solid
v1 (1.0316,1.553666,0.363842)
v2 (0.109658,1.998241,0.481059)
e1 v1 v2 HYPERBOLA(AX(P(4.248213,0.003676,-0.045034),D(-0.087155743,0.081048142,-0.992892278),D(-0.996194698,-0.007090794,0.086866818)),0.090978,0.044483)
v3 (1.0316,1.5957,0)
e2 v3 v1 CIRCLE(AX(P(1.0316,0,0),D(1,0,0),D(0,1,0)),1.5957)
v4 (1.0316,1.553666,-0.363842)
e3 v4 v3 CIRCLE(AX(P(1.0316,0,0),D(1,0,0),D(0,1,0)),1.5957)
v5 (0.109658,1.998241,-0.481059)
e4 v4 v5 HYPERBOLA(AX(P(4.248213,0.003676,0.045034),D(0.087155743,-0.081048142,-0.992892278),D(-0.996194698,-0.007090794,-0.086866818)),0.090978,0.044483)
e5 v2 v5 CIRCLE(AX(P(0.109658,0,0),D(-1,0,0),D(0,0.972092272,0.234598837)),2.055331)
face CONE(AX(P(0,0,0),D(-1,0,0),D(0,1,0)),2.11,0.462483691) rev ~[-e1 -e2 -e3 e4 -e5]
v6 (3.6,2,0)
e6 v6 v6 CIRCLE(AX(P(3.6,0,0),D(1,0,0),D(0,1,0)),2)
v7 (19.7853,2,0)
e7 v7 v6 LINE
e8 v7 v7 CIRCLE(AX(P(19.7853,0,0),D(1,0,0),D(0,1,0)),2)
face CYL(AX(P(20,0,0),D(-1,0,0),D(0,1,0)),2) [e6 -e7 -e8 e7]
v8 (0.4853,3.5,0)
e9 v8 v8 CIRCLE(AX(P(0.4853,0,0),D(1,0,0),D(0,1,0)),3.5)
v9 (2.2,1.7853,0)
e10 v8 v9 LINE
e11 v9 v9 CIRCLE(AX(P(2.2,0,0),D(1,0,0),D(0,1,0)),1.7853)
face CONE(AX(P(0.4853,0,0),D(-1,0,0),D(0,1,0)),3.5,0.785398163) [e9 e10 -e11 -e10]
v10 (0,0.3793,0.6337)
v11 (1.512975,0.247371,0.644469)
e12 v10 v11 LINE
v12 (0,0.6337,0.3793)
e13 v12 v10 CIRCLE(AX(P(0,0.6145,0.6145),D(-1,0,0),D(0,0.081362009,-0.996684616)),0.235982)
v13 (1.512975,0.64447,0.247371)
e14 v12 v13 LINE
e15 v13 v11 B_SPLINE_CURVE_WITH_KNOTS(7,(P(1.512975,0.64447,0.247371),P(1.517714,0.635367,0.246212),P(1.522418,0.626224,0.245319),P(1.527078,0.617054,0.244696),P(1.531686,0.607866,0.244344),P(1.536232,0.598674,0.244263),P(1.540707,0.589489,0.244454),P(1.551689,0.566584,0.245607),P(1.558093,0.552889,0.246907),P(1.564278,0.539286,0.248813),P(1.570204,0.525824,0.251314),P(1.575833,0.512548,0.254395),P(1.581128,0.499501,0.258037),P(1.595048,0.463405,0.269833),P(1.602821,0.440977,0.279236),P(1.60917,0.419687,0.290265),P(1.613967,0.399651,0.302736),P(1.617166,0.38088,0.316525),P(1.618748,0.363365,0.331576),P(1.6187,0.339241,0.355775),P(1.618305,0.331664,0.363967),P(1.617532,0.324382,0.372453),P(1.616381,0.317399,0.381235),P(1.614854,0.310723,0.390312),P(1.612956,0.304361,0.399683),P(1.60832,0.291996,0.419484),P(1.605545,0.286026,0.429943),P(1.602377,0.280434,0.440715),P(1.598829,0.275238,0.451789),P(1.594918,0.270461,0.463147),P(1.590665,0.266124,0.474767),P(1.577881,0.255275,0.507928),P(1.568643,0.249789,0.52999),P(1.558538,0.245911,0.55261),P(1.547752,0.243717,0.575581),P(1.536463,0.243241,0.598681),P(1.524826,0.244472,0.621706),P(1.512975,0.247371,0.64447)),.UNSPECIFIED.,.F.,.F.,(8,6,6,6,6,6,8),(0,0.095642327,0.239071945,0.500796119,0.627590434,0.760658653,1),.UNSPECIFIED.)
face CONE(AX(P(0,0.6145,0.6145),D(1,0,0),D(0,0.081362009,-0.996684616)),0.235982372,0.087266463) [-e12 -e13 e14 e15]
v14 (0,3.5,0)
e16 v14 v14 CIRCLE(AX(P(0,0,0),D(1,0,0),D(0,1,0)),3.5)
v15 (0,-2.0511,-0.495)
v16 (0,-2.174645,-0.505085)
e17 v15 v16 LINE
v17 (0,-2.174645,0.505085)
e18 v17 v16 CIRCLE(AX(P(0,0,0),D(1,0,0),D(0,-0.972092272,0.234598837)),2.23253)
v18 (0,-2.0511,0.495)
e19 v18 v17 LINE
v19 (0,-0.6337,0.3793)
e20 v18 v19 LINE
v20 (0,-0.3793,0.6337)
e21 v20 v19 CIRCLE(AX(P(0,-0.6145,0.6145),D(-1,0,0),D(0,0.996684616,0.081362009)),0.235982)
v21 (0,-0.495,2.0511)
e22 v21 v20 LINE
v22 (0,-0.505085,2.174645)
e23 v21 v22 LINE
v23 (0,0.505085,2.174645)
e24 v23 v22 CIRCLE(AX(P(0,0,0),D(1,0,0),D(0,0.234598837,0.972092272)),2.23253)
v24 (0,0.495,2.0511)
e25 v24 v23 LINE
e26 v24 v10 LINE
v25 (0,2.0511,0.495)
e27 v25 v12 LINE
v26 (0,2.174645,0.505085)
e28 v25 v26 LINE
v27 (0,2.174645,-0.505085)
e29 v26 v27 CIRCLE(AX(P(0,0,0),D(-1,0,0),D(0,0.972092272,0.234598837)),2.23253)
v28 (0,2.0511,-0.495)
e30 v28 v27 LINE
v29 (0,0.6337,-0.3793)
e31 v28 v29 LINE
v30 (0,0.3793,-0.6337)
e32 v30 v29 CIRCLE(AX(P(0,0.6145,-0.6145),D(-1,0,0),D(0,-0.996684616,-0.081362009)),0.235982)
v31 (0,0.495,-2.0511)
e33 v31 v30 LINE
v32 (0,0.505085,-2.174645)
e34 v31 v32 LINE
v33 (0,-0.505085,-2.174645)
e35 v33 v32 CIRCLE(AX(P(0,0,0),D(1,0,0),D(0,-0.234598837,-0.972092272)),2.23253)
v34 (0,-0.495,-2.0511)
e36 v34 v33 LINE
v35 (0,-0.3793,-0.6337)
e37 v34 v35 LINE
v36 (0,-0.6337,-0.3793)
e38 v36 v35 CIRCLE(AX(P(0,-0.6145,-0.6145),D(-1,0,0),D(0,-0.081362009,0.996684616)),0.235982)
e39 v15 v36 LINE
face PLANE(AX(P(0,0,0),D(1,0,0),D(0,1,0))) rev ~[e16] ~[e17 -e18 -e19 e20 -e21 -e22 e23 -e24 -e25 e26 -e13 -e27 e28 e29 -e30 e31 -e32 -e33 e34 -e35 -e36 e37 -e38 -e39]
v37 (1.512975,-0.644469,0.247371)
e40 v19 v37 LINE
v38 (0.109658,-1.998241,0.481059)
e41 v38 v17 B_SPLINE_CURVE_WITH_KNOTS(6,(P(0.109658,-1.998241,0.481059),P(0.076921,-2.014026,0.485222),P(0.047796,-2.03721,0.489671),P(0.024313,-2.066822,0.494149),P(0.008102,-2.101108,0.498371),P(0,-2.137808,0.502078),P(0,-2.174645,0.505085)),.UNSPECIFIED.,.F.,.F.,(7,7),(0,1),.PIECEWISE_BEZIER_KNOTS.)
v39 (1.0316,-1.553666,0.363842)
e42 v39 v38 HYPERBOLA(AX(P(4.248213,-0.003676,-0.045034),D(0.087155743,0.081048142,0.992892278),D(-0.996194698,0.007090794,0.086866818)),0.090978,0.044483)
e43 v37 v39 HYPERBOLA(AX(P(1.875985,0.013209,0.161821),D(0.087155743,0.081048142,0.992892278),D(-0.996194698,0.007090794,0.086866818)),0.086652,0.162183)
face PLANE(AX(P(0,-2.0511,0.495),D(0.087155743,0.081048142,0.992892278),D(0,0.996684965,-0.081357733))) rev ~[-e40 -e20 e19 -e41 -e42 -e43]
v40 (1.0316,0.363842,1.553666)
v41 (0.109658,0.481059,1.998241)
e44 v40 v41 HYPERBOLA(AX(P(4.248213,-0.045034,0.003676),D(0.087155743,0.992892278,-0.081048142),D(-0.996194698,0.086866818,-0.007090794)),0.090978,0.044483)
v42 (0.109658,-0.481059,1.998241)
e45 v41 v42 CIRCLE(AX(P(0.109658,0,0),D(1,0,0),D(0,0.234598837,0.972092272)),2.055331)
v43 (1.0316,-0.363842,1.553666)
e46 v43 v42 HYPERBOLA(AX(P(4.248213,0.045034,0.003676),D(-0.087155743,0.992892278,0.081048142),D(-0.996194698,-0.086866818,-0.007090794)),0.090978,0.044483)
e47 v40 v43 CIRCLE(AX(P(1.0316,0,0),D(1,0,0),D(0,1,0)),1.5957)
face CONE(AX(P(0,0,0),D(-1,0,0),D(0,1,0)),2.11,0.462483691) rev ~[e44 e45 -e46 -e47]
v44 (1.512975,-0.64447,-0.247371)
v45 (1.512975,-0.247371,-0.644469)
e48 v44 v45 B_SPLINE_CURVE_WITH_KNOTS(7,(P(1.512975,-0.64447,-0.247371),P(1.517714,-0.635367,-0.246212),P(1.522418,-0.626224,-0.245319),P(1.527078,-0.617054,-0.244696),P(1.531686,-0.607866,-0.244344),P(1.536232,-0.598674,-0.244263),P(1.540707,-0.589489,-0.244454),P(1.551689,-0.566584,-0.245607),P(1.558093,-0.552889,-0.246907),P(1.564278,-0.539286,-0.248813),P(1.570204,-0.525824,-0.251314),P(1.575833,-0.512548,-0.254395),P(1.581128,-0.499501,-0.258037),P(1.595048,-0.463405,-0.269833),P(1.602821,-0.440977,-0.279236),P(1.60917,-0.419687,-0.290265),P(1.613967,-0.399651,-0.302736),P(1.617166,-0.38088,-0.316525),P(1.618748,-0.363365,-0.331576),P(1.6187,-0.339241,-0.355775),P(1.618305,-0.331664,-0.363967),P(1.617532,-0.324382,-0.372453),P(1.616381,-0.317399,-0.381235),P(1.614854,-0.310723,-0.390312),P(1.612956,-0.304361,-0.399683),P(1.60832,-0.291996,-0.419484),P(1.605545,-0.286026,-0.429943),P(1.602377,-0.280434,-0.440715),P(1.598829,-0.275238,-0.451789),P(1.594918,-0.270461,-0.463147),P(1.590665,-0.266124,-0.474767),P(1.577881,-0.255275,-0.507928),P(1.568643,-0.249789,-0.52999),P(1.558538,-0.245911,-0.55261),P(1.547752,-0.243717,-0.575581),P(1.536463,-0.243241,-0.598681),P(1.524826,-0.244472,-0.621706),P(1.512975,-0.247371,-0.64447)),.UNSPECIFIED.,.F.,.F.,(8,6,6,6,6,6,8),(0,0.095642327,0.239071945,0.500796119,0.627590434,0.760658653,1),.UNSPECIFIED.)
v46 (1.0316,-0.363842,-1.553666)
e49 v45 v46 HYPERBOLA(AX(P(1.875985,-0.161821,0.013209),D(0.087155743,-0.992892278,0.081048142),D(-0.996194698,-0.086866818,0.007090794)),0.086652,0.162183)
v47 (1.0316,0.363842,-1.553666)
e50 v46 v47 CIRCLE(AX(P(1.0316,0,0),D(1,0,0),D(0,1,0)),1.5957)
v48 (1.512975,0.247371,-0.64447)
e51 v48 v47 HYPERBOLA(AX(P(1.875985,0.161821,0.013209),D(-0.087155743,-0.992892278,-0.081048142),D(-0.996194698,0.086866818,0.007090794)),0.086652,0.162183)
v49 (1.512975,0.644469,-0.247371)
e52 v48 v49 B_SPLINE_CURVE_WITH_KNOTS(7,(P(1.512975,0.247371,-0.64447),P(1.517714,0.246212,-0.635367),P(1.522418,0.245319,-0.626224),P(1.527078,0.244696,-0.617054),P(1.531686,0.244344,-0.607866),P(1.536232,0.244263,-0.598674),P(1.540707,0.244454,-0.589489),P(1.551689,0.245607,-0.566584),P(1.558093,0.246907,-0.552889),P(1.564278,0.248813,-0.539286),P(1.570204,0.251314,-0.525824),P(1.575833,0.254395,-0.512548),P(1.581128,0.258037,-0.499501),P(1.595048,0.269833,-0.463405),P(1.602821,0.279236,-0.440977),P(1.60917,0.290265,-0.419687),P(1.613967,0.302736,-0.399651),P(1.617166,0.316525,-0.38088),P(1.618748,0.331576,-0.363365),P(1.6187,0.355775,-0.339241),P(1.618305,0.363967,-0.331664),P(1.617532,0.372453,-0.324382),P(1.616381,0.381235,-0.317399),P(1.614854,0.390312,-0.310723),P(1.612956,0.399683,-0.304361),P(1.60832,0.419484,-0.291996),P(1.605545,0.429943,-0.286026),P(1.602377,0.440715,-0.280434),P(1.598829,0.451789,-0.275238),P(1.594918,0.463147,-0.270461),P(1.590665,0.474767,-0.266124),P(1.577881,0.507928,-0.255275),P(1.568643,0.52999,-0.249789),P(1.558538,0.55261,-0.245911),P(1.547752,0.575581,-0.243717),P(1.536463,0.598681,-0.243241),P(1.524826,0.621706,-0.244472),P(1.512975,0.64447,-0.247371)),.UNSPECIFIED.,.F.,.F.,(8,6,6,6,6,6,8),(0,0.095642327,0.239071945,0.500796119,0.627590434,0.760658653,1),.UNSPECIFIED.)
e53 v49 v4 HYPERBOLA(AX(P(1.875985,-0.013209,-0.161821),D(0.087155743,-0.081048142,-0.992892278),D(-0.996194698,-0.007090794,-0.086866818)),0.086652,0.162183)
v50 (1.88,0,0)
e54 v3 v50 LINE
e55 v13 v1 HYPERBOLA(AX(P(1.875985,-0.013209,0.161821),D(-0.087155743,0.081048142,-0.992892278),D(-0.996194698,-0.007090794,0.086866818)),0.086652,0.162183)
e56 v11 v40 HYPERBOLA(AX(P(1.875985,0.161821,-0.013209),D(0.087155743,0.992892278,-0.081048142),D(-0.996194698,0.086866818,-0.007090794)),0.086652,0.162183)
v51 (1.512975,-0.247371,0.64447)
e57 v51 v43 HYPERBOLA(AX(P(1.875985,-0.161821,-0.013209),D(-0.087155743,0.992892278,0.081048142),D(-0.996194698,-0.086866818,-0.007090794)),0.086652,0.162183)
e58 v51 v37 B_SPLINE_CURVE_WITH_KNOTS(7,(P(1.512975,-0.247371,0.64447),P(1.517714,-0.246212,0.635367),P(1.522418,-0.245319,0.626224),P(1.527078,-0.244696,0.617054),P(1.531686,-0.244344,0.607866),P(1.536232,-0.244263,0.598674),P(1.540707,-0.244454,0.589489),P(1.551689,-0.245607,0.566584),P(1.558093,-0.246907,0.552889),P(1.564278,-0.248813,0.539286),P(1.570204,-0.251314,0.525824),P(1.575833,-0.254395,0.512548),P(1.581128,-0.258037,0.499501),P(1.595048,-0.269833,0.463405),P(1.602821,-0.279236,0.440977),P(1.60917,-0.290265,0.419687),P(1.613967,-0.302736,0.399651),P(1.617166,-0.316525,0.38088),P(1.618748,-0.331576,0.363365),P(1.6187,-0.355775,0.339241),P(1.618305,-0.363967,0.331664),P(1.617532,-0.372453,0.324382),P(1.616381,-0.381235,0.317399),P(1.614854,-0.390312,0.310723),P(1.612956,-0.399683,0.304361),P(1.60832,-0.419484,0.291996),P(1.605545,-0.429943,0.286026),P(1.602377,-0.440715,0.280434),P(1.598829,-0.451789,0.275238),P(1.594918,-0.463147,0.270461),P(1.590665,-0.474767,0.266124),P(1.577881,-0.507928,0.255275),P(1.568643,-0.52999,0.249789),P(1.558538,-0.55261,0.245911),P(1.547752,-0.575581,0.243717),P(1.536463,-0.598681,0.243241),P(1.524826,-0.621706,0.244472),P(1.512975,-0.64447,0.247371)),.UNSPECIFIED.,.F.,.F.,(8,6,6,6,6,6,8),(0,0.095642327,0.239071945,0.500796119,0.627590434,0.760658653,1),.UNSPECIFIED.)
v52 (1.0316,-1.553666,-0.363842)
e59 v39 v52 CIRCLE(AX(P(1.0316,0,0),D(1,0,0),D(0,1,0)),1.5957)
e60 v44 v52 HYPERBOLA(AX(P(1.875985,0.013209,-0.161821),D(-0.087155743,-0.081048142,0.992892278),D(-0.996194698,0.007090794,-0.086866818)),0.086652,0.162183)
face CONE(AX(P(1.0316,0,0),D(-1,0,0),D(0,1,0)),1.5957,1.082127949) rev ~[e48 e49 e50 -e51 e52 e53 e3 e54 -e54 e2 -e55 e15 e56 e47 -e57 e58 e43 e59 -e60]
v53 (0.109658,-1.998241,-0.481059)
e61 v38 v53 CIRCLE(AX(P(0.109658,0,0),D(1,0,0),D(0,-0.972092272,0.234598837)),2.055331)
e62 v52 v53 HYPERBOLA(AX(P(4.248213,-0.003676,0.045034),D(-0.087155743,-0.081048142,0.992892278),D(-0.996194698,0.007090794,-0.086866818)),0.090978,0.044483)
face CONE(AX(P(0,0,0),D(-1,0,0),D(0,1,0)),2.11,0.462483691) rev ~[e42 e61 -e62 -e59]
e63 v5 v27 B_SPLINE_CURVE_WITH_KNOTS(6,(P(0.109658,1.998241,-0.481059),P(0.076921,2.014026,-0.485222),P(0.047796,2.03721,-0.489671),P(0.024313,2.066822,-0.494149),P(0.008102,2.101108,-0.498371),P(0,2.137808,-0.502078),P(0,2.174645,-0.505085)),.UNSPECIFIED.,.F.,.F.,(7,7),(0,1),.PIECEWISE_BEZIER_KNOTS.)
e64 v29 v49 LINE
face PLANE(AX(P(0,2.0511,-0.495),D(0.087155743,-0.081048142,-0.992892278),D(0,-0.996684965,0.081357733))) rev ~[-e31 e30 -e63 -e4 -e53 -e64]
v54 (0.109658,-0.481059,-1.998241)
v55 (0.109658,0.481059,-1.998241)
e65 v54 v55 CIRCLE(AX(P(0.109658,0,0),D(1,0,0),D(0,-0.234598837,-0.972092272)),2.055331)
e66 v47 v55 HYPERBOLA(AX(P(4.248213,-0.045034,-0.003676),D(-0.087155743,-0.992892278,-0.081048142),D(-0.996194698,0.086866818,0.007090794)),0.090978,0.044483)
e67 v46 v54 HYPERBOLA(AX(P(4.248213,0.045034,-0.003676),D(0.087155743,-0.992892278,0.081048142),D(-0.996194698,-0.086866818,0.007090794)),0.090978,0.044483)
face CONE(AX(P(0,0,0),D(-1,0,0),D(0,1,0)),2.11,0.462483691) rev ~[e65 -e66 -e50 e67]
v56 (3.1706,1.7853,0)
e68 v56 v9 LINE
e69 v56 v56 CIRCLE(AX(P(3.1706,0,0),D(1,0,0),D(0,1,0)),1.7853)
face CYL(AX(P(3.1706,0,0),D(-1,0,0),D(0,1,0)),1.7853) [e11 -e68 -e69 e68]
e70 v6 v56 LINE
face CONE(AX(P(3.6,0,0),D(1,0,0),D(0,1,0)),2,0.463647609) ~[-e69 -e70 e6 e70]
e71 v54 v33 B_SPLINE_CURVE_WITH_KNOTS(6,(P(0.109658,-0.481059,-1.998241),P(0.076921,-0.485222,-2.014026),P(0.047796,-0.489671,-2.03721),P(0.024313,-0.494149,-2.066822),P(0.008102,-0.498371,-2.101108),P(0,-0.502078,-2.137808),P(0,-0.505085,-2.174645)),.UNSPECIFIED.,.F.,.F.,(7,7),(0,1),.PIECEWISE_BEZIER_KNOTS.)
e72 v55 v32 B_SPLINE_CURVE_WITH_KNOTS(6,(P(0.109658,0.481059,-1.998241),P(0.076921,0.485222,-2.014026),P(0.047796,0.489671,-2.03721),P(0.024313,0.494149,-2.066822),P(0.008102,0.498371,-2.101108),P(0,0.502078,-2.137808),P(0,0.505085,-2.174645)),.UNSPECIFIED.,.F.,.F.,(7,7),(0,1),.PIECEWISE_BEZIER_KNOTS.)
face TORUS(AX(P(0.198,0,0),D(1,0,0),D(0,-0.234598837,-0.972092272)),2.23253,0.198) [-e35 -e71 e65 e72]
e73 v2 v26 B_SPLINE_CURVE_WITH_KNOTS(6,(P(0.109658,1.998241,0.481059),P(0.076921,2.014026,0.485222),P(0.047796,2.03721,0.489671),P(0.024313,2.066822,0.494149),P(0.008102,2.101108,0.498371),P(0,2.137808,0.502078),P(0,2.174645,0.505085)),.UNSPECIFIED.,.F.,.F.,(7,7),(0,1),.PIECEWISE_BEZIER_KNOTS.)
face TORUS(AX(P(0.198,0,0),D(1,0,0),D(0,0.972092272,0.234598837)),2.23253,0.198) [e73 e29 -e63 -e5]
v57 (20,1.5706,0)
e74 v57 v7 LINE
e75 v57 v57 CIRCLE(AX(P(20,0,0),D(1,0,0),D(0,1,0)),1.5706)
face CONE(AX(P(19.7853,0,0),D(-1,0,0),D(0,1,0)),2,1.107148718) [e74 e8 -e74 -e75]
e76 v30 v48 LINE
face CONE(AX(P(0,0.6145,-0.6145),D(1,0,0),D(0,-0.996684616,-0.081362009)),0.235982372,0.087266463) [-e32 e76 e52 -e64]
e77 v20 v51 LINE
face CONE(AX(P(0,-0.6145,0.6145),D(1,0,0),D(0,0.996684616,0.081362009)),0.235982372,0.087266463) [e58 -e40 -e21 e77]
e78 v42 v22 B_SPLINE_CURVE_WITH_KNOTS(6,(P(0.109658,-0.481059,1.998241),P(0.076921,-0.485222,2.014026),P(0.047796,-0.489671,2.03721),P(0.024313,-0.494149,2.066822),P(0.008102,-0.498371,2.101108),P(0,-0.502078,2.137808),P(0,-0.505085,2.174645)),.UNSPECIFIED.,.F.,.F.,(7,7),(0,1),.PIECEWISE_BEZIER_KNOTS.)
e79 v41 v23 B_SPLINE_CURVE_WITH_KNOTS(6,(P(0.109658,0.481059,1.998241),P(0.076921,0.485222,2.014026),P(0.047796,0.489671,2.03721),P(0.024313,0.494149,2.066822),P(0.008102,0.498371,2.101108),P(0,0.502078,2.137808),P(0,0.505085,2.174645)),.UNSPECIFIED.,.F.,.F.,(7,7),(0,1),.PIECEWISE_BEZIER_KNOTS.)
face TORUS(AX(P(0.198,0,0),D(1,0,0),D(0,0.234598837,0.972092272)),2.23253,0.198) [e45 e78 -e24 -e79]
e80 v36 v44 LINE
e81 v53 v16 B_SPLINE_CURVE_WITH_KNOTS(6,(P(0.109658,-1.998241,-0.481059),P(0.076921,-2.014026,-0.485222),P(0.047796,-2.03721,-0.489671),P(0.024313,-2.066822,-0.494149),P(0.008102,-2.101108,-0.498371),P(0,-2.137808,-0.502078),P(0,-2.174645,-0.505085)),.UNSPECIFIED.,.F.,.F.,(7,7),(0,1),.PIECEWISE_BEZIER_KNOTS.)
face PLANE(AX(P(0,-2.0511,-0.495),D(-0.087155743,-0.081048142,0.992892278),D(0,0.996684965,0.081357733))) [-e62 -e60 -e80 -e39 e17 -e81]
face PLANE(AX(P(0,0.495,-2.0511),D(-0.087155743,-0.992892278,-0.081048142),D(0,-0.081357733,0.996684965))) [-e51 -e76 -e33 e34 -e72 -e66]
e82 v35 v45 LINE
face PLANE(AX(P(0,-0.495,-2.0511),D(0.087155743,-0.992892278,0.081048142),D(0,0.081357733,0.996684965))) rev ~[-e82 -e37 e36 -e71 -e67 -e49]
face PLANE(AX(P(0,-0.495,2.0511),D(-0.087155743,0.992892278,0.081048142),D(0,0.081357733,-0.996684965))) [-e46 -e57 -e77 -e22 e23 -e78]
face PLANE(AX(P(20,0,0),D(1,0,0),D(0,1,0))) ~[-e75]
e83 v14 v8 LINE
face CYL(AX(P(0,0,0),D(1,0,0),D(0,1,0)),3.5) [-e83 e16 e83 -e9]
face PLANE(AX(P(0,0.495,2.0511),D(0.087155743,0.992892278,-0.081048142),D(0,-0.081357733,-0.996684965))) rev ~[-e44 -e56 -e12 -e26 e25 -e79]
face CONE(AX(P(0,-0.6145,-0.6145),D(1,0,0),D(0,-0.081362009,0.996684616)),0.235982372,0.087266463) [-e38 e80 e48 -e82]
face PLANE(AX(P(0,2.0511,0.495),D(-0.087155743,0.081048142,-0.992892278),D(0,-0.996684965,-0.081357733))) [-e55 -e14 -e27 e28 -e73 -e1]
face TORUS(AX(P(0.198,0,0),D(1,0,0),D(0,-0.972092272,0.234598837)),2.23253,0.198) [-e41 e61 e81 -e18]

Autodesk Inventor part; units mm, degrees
ref_plane "YZ Plane" through (0, 0, 0) normal (1, 0, 0) x (0, 1, 0)
ref_plane "XZ Plane" through (0, 0, 0) normal (0, 1, 0) x (-1, 0, 0)
sketch "Sketch1" plane through (0, 0, 0) normal (0, 0, 1) x (1, 0, 0)
  line L0 (1.88, 0) -> (20, 0)
  line L1 (20, 0) -> (20, 2)
  line L2 (20, 2) -> (3.6, 2)
  line L3 (3.6, 2) -> (3.1706, 1.7853)
  line L4 (3.1706, 1.7853) -> (2.2, 1.7853)
  line L5 (0, 3.5) -> (0, 2.11)
  line L6 (0, 2.11) -> (1.0316, 1.5957)
  line L7 (1.0316, 1.5957) -> (1.88, 0)
  line L8 (-4, 0) -> (24, 0) projected
  line L9 (0, -0.7) -> (0, 4.2) projected
  line L10 (0, 3.5) -> (0.4853, 3.5)
  line L11 (0.4853, 3.5) -> (2.2, 1.7853)
  line L12 (3.6, 2) -> (1.9853, 2) construction
  dimension "d1" = 16.4
  dimension "d2" = 4
  dimension "d3" = 3.5706
  dimension "d4" = 4.22
  dimension "d5" = 26.5
  dimension "d6" = 62
  dimension "d7" = 1.88
  dimension "d8" = 0.4294
  dimension "d12" = 7
  dimension "d13" = 45
  dimension "d15" = 20
  dimension "d24" = 2.2
revolve "Body" add sketch "Sketch1" angle 360 about axis through (1.88, 0, 0) along (1, 0, 0) contours L7 L6 L5 L10 L11 L4 L3 L2 L1 L0
sketch "Sketch2" plane through (0, 0, 0) normal (-1, 0, 0) x (0, 0, 1)
  line L0 (0, 2.11) -> (0, 0) construction
  line L1 (0, 0) -> (2.11, 0) construction
  arc A0 (0.633, 0) -> (0, 0.633) centre (0, 0) ccw construction
  arc A1 (0.7385, 0) -> (0, 0.7385) centre (0, 0) ccw construction
  arc A2 (2.0511, 0.495) -> (0.495, 2.0511) centre (0, 0) ccw
  line L2 (0, 0) -> (1.492, 1.492) construction
  line L3 (0.495, 2.0511) -> (0.3793, 0.6337)
  line L4 (2.0511, 0.495) -> (0.6337, 0.3793)
  arc A3 (0.495, 2.0511) -> (0, 2.11) centre (0, 0) ccw
  arc A4 (2.11, 0) -> (2.0511, 0.495) centre (0, 0) ccw
  line L5 (0, -4.9) -> (0, 4.9) projected
  line L6 (-4.9, 0) -> (4.9, 0) projected
  arc A5 (0.495, -2.0511) -> (2.0511, -0.495) centre (0, 0) ccw
  line L7 (0.495, -2.0511) -> (0.3793, -0.6337)
  line L8 (2.0511, -0.495) -> (0.6337, -0.3793)
  arc A6 (0, -2.11) -> (0.495, -2.0511) centre (0, 0) ccw
  arc A7 (2.0511, -0.495) -> (2.11, 0) centre (0, 0) ccw
  arc A8 (-0.495, 2.0511) -> (-2.0511, 0.495) centre (0, 0) ccw
  line L9 (-0.495, 2.0511) -> (-0.3793, 0.6337)
  line L10 (-2.0511, 0.495) -> (-0.6337, 0.3793)
  arc A9 (0, 2.11) -> (-0.495, 2.0511) centre (0, 0) ccw
  arc A10 (-2.0511, 0.495) -> (-2.11, 0) centre (0, 0) ccw
  arc A11 (-0.495, -2.0511) -> (0, -2.11) centre (0, 0) ccw
  arc A12 (-2.0511, -0.495) -> (-0.495, -2.0511) centre (0, 0) ccw
  arc A13 (-2.11, 0) -> (-2.0511, -0.495) centre (0, 0) ccw
  line L11 (-2.0511, -0.495) -> (-0.6337, -0.3793)
  line L12 (-0.495, -2.0511) -> (-0.3793, -0.6337)
  arc A14 (0.3793, 0.6337) -> (0.6337, 0.3793) centre (0.6145, 0.6145) ccw
  arc A15 (0.6337, -0.3793) -> (0.3793, -0.6337) centre (0.6145, -0.6145) ccw
  arc A16 (-0.6337, 0.3793) -> (-0.3793, 0.6337) centre (-0.6145, 0.6145) ccw
  arc A17 (-0.3793, -0.6337) -> (-0.6337, -0.3793) centre (-0.6145, -0.6145) ccw
  point P0 (1.492, -1.492)
  point P1 (-1.492, 1.492)
  point P2 (-1.492, -1.492)
  dimension "d17" = 1.266
  dimension "d18" = 1.477
  dimension "d19" = 4.22
  dimension "d20" = 45
  dimension "d21" = 0.495
extrude "Slot" add sketch "Sketch2" against normal up to next draft 5 contours L4 A14 L3 A2 | A5 L7 A15 L8 | L9 A16 L10 A8 | A12 L11 A17 L12
fillet "Fillet1" radius 0.198 4 edges at (0, 2.11, 0) (0, 0, -2.11) (0, -2.11, 0) (0, 0, 2.11)
thread "Thread" size "M4x0.7" class "6g" standard "ISO Metric profile" length 16.4
chamfer "Chamfer1" distance 0.4294 distance2 0.2147 1 edges at (20, -2, 0) measured on face at (20, -0.6473, 0.1595)
ref_plane "Work Plane2" through (3.35, 0, 0) normal (0, 0, -1) x (1, 0, 0)
equation "\"d17\" = 0.3 * SDM"
equation "\"d18\" = 0.35 * SDM"
equation "\"d19\" = SDM"
equation "\"d21\" = 0.5 * SBR"
equation "\"d1\" = GEL"
equation "\"d2\" = GD"
equation "\"d3\" = BDM"
equation "\"d4\" = SDM"
equation "\"d7\" = INTI"
equation "\"d8\" = GAL"
equation "\"d12\" = KOD"
equation "\"d13\" = 0.5 * SEWI"
equation "\"d15\" = NLG"
equation "\"d24\" = KOH"
equation "\"d23\" = 0.2 * SBR"
equation "\"d10\" = GEL"
equation "\"d25\" = -0.5 * SPD + 0.5 * GD"
equation "\"d26\" = 0.5 * GAL"
equation "\"NLG\" = 20"
equation "\"GEL\" = 16.4"
equation "\"GAL\" = 0.61345 * PTC"
equation "\"SPD\" = NND - 1.2269 * PTC"
equation "\"KOD\" = 7"
equation "\"KOH\" = 2.2"
equation "\"SBR\" = 0.99"
equation "\"INTI\" = 1.88"
equation "\"SDM\" = 4.22"
equation "\"GD\" = NND"
equation "\"BDM\" = NND - GAL"
equation "\"SEWI\" = 90deg"
equation "\"d9\" = SDM"
equation "\"GUL\" = 0.61345 * PTC"
equation "\"TOA\" = 30deg"
equation "\"EPV\" = 4.2"
equation "\"THREADDIA\" = 4"
equation "\"RR\" = 0.4"
equation "\"PTC\" = 0.7"
equation "\"NND\" = 4"
equation "\"GD1\" = THREADDIA - 1.2269 * PTC"
properties part number "AS 1427 - M4 x 20" material "Steel, Mild"
